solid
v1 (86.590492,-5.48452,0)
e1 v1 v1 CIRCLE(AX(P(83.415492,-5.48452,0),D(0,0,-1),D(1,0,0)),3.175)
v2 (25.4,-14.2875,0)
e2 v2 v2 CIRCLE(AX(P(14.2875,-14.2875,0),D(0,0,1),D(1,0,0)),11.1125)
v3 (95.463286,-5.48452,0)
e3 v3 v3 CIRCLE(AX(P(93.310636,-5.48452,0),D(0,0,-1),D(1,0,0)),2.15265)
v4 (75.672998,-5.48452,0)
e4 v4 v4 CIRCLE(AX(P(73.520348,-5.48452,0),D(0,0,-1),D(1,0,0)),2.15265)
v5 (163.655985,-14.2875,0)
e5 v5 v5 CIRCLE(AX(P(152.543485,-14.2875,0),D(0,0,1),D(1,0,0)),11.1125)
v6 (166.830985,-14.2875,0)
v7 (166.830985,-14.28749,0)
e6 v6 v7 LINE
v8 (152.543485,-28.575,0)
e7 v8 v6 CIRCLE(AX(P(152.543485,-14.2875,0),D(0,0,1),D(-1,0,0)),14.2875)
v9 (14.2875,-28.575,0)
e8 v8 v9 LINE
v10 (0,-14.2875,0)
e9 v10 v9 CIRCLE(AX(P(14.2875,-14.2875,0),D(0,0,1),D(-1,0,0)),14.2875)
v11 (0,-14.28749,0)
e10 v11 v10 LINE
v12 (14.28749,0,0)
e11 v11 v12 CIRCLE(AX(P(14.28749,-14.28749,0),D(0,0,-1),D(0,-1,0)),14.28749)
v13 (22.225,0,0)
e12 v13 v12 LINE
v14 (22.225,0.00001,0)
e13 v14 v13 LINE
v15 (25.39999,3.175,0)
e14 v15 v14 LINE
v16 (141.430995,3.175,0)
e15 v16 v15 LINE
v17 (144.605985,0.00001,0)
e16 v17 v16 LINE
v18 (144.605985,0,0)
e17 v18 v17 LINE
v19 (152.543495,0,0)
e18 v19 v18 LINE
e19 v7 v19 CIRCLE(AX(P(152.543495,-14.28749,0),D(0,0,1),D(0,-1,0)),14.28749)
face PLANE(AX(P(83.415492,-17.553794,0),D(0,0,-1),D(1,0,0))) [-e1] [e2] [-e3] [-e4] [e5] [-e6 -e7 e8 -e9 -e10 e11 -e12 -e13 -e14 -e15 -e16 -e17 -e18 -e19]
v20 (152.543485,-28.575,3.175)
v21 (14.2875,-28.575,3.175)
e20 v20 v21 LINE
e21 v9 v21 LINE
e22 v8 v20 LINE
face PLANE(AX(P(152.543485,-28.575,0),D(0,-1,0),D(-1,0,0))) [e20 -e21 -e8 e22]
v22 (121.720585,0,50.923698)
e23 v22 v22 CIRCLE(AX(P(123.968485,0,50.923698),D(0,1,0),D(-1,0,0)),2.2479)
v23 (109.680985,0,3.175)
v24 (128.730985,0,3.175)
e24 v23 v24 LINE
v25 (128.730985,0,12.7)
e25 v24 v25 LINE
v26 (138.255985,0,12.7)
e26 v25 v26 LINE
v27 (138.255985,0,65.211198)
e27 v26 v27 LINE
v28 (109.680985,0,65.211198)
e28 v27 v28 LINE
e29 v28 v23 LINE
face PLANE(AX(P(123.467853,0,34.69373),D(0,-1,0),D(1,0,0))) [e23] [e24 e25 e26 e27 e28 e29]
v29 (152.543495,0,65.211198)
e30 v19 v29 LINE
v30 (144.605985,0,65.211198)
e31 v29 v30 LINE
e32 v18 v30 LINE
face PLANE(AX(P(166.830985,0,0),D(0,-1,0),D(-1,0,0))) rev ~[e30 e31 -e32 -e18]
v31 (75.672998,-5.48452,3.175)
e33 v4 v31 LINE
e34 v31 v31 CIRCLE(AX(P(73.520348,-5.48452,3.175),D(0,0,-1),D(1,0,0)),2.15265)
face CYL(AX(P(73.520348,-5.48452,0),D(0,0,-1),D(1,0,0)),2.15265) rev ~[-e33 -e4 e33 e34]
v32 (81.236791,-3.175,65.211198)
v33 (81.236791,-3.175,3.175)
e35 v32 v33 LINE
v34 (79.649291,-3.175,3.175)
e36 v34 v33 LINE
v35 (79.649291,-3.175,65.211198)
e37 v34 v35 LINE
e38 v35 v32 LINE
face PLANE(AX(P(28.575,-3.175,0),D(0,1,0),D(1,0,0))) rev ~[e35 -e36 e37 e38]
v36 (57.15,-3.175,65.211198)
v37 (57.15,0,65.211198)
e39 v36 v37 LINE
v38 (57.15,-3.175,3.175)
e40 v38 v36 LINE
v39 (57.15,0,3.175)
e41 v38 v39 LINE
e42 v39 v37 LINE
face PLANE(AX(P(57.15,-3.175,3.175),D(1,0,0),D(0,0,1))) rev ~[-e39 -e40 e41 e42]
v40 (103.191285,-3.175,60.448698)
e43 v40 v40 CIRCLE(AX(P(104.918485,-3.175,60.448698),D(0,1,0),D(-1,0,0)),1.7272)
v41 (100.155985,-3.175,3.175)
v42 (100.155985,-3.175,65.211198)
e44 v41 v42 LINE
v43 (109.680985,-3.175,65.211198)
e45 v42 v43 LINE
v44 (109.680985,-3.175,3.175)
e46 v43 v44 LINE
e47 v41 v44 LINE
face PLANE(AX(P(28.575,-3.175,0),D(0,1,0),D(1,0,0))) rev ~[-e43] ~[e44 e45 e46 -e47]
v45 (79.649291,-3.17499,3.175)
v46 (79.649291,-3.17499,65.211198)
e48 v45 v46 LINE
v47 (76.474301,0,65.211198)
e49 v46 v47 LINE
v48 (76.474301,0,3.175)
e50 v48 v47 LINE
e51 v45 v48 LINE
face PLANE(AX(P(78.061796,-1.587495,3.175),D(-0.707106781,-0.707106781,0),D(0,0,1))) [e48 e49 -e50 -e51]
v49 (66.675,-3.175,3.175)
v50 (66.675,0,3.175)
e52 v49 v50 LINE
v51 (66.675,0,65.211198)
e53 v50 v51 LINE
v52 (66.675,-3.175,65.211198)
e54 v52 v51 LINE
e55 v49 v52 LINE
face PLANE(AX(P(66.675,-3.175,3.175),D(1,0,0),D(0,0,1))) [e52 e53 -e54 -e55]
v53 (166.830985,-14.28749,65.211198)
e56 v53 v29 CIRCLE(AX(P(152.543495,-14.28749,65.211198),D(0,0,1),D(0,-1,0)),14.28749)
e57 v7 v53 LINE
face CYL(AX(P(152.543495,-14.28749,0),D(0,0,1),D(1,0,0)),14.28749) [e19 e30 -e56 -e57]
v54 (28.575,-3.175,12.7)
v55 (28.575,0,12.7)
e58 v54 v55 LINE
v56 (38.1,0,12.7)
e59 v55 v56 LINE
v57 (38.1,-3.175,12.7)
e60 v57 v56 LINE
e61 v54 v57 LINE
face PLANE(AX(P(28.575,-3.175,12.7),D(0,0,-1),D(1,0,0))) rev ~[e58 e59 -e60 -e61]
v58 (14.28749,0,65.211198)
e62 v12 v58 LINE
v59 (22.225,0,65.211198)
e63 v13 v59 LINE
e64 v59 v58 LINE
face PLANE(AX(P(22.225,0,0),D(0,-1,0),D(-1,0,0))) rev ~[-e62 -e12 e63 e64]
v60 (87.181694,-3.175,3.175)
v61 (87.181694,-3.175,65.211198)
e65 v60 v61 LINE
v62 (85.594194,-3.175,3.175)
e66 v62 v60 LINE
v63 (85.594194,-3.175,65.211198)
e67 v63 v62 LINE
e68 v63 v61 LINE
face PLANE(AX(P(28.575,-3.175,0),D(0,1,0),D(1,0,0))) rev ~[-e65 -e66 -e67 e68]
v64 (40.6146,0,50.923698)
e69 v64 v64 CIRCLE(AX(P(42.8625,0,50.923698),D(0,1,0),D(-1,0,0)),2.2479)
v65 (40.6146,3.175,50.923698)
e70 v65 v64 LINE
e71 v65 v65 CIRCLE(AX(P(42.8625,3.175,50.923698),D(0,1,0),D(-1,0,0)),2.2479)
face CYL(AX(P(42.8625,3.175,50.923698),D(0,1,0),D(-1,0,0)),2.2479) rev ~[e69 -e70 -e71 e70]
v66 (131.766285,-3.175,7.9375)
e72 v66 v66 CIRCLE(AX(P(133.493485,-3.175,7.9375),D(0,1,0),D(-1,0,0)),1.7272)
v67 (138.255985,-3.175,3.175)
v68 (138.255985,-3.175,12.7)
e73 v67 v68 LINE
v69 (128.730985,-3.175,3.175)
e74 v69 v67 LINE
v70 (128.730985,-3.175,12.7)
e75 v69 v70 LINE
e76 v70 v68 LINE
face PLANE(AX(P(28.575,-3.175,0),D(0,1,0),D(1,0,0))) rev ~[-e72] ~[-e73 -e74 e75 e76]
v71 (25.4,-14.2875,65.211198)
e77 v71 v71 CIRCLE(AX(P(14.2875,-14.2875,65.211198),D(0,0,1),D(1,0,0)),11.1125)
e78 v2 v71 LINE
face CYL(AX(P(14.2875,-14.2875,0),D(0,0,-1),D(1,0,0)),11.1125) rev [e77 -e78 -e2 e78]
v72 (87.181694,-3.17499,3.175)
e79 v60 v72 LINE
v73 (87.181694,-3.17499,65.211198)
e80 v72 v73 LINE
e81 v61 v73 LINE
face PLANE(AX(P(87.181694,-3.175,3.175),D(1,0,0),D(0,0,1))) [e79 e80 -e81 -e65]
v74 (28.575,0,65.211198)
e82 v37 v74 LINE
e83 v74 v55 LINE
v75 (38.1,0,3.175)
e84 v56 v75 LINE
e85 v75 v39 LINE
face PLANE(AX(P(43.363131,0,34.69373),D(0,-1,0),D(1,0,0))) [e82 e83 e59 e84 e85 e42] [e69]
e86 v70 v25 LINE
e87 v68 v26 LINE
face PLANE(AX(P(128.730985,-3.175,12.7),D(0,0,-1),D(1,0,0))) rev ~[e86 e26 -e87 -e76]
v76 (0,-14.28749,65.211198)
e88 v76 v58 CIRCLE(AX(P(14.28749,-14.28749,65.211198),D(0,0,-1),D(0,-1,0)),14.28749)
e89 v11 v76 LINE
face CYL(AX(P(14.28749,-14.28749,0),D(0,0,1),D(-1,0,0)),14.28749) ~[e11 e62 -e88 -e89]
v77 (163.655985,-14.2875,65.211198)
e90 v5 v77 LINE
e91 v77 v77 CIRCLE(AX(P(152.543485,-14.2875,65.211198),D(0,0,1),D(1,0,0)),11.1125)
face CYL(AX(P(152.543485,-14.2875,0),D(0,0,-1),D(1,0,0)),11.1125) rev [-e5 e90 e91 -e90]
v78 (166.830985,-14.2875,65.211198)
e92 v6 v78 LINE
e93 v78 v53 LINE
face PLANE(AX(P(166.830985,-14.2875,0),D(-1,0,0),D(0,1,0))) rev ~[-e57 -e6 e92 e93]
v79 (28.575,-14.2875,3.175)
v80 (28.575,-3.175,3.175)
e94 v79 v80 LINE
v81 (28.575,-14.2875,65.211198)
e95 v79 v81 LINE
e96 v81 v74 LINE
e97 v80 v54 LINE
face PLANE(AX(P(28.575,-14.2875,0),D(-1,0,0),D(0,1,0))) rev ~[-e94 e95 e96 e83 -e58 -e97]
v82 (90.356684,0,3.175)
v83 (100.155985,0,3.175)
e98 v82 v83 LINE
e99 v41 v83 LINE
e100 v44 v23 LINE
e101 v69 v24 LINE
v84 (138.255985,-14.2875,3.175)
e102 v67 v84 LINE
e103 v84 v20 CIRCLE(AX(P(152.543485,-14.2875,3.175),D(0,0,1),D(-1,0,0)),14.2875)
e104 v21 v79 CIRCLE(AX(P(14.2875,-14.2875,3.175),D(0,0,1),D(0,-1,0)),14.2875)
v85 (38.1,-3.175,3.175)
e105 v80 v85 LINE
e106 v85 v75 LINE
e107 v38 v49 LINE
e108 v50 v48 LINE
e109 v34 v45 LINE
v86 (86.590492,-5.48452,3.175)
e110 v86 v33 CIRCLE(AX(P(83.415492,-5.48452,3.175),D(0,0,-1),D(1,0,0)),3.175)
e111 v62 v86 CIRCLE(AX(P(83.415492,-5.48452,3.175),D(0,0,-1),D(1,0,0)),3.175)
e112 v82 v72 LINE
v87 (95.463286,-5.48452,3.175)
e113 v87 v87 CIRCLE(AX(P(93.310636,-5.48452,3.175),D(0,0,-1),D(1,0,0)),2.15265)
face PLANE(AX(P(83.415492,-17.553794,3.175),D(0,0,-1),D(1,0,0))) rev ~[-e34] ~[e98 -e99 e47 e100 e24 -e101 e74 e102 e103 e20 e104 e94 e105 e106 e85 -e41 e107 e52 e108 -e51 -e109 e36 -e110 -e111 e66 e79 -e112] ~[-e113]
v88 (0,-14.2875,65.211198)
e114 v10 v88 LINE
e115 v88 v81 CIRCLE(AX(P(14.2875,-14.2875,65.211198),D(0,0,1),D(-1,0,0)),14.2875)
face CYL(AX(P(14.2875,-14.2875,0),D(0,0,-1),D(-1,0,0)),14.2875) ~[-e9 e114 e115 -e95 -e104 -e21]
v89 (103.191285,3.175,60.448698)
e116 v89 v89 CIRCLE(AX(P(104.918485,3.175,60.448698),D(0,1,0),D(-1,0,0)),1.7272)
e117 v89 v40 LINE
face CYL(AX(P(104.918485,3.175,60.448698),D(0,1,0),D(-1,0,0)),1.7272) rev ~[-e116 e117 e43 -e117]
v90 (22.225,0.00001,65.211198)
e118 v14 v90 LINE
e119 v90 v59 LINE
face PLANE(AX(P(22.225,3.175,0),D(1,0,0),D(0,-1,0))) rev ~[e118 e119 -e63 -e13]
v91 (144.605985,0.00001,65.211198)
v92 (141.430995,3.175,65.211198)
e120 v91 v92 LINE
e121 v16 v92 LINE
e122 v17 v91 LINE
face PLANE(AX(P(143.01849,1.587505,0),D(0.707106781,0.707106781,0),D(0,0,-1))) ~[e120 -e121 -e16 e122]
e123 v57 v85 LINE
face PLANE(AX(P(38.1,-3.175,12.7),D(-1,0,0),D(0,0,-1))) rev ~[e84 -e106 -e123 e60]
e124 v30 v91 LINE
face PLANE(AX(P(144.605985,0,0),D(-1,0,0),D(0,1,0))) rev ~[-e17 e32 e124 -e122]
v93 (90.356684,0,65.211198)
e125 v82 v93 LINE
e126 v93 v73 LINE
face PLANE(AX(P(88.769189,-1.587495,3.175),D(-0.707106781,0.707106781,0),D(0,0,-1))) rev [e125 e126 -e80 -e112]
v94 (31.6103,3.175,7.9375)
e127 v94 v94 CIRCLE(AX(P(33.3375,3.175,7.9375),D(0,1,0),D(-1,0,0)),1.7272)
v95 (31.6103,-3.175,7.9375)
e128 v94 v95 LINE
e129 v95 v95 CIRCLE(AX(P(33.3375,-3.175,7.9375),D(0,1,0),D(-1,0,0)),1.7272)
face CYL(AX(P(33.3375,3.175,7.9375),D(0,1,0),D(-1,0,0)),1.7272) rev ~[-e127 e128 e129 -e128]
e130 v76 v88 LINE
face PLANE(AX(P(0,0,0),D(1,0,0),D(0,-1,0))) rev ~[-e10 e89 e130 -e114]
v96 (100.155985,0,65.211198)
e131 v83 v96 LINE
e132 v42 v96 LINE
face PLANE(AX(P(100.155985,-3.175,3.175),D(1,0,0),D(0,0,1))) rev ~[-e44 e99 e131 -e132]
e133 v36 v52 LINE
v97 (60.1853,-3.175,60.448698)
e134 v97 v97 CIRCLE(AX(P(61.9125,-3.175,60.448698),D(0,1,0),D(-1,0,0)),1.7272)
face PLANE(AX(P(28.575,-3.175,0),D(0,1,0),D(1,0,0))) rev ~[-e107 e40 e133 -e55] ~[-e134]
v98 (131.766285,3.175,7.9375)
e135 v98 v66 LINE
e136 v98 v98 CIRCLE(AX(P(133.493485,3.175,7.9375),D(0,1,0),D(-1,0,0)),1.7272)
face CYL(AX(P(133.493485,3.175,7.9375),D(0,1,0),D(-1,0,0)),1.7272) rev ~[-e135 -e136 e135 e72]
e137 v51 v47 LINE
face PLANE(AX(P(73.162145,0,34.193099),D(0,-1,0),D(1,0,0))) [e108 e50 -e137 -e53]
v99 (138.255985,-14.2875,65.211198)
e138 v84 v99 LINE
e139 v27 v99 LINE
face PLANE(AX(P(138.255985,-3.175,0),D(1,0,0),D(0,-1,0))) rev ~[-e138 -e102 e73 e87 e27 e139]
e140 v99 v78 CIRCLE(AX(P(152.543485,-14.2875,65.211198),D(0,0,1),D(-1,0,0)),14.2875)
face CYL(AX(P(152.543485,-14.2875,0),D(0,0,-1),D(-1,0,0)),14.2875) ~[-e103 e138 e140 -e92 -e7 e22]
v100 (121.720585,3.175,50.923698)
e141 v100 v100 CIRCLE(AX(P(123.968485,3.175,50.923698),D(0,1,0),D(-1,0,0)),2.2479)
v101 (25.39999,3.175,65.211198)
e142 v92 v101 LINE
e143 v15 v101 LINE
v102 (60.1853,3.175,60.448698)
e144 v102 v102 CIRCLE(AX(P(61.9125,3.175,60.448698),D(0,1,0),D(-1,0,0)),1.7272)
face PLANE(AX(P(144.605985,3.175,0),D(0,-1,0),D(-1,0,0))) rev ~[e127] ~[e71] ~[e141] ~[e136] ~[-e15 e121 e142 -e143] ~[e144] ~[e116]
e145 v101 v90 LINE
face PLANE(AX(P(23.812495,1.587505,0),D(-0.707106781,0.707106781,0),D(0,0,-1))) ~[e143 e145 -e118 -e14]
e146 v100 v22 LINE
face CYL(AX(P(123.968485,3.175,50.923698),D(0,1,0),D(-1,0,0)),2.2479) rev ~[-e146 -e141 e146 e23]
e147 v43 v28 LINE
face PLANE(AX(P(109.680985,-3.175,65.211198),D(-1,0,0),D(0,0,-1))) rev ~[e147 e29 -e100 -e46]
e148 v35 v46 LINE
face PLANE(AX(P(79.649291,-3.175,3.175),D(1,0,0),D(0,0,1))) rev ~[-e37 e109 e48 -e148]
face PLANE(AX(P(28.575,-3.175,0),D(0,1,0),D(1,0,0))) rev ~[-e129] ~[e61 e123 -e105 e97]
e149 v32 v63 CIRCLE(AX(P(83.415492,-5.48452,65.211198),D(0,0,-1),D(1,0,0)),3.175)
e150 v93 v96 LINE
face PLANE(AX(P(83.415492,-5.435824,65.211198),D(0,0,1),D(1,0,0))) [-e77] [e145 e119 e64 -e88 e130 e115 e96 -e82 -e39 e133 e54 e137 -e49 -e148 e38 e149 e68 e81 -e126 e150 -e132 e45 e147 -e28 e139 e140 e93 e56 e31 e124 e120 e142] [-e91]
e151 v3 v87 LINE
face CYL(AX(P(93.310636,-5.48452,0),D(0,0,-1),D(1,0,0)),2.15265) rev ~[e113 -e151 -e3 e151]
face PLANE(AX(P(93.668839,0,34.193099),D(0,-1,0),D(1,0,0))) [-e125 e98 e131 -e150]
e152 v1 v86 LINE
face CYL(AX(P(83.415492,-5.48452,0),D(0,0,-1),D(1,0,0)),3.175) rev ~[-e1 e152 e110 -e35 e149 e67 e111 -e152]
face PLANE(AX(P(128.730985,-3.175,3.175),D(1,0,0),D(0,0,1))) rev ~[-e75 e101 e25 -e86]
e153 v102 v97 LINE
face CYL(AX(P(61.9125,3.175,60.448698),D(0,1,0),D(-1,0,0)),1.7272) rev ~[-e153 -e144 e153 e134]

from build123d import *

# Parameters (mm, degrees)
F0_R      = 11.1125
F1_DEPTH  = 65.211198
F3_DEPTH  = 3.175
F4_R      = 14.28749
F5_R      = 2.2479
F5_R_2    = 1.7272
F6_DEPTH  = 6.35
F7_R      = 3.175
F7_R_2    = 2.15265
F8_DEPTH  = 65.211198
F9_W      = 12.9742907321
F9_H      = 62.036198
F10_DEPTH = 3.175
F11_SIZE  = 3.17499


# Not quite as in the source:
# - a fillet or chamfer is up to 0.001 mm smaller than in the source, because OpenCascade refuses the exact size
# - a feature names something its author has since deleted; it is built from what else it names


with BuildPart() as f1:
    # F0 (on Top) → F1 (new body)
    with BuildSketch(Plane.XY):
        with BuildLine():
            Line((22.225, 0), (0, 0))
            Line((0, 0), (0, -14.2875))
            ThreePointArc((0, -14.2875), (14.2875, -28.575), (28.575, -14.2875))
            Line((28.575, -14.2875), (28.575, -3.175))
            Line((28.575, -3.175), (138.2559846, -3.175))
            Line((138.2559846, -3.175), (138.2559846, -14.2875))
            ThreePointArc((138.2559846, -14.2875), (152.5434846, -28.575), (166.8309846, -14.2875))
            Line((166.8309846, -14.2875), (166.8309846, 0))
            Line((166.8309846, 0), (144.6059846, 0))
            Line((144.6059846, 0), (144.6059846, 3.175))
            Line((144.6059846, 3.175), (22.225, 3.175))
            Line((22.225, 3.175), (22.225, 0))
        make_face()
        with Locations((14.2875, -14.2875)):
            Circle(F0_R, mode=Mode.SUBTRACT)
        with Locations((152.5434846, -14.2875)):
            Circle(F0_R, mode=Mode.SUBTRACT)
    extrude(amount=F1_DEPTH)

    # F2 (on face) → F3 (join)
    with BuildSketch(Plane(origin=(0, 0, 0), x_dir=(1, 0, 0), z_dir=(0, 0, -1))):
        with BuildLine():
            Line((152.5434846, 28.575), (14.2875, 28.575))
            ThreePointArc((14.2875, 28.575), (24.3902881362, 24.3902881362), (28.575, 14.2875))
            Line((28.575, 14.2875), (28.575, 3.175))
            Line((28.575, 3.175), (138.2559846, 3.175))
            Line((138.2559846, 3.175), (138.2559846, 14.2875))
            ThreePointArc((138.2559846, 14.2875), (142.4406964638, 24.3902881362), (152.5434846, 28.575))
        make_face()
    extrude(amount=-F3_DEPTH)

    # F4 (radius 14.2875 in the source; OpenCascade refuses exactly that, so slightly less here)
    f4_edges = [f1.edges().sort_by_distance(p)[0] for p in [
        (0, 0, 32.605599),
        (166.830985, 0, 32.605599),
    ]]
    fillet(f4_edges, radius=F4_R)

    # F5 (on face) → F6 (cut, through all)
    with BuildSketch(Plane(origin=(0, 3.175, 0), x_dir=(-1, 0, 0), z_dir=(0, 1, 0))):
        with Locations((-123.9684846, 50.923698)):
            Circle(F5_R)
        with Locations((-104.9184846, 60.448698)):
            Circle(F5_R_2)
        with Locations((-61.9125, 60.448698)):
            Circle(F5_R_2)
        with Locations((-42.8625, 50.923698)):
            Circle(F5_R)
        with Locations((-133.4934846, 7.9375)):
            Circle(F5_R_2)
        with Locations((-33.3375, 7.9375)):
            Circle(F5_R_2)
    extrude(amount=-F6_DEPTH, mode=Mode.SUBTRACT)

    # F7 (on face) → F8 (cut, through all)
    with BuildSketch(Plane(origin=(0, 0, 0), x_dir=(1, 0, 0), z_dir=(0, 0, -1))):
        with Locations((83.4154923, 5.4845204)):
            Circle(F7_R)
        with Locations((73.5203484069, 5.4845204)):
            Circle(F7_R_2)
        with Locations((93.3106361931, 5.4845204)):
            Circle(F7_R_2)
    extrude(amount=-F8_DEPTH, mode=Mode.SUBTRACT)

    # F9 (on face) → F10 (cut)
    with BuildSketch(Plane.XZ.offset(3.175)):
        Polygon((57.15, 65.211198), (28.575, 65.211198), (28.575, 12.7), (38.1, 12.7), (38.1, 3.175), (57.15, 3.175), align=None)
        Polygon((138.2559846, 12.7), (138.2559846, 65.211198), (109.6809846, 65.211198), (109.6809846, 3.175), (128.7309846, 3.175), (128.7309846, 12.7), align=None)
        with Locations((73.162145366, 34.193099)):
            Rectangle(F9_W, F9_H)
        with Locations((93.668839234, 34.193099)):
            Rectangle(F9_W, F9_H)
    extrude(amount=-F10_DEPTH, mode=Mode.SUBTRACT)

    # F11 (size 3.175 in the source; OpenCascade refuses exactly that, so slightly less here)
    f11_edges = [f1.edges().sort_by_distance(p)[0] for p in [
        (22.225, 3.175, 32.605599),
        (144.605985, 3.175, 32.605599),
        (87.181694, 0, 34.193099),
        (79.649291, 0, 34.193099),
    ]]
    chamfer(f11_edges, length=F11_SIZE)


solid = f1.part
